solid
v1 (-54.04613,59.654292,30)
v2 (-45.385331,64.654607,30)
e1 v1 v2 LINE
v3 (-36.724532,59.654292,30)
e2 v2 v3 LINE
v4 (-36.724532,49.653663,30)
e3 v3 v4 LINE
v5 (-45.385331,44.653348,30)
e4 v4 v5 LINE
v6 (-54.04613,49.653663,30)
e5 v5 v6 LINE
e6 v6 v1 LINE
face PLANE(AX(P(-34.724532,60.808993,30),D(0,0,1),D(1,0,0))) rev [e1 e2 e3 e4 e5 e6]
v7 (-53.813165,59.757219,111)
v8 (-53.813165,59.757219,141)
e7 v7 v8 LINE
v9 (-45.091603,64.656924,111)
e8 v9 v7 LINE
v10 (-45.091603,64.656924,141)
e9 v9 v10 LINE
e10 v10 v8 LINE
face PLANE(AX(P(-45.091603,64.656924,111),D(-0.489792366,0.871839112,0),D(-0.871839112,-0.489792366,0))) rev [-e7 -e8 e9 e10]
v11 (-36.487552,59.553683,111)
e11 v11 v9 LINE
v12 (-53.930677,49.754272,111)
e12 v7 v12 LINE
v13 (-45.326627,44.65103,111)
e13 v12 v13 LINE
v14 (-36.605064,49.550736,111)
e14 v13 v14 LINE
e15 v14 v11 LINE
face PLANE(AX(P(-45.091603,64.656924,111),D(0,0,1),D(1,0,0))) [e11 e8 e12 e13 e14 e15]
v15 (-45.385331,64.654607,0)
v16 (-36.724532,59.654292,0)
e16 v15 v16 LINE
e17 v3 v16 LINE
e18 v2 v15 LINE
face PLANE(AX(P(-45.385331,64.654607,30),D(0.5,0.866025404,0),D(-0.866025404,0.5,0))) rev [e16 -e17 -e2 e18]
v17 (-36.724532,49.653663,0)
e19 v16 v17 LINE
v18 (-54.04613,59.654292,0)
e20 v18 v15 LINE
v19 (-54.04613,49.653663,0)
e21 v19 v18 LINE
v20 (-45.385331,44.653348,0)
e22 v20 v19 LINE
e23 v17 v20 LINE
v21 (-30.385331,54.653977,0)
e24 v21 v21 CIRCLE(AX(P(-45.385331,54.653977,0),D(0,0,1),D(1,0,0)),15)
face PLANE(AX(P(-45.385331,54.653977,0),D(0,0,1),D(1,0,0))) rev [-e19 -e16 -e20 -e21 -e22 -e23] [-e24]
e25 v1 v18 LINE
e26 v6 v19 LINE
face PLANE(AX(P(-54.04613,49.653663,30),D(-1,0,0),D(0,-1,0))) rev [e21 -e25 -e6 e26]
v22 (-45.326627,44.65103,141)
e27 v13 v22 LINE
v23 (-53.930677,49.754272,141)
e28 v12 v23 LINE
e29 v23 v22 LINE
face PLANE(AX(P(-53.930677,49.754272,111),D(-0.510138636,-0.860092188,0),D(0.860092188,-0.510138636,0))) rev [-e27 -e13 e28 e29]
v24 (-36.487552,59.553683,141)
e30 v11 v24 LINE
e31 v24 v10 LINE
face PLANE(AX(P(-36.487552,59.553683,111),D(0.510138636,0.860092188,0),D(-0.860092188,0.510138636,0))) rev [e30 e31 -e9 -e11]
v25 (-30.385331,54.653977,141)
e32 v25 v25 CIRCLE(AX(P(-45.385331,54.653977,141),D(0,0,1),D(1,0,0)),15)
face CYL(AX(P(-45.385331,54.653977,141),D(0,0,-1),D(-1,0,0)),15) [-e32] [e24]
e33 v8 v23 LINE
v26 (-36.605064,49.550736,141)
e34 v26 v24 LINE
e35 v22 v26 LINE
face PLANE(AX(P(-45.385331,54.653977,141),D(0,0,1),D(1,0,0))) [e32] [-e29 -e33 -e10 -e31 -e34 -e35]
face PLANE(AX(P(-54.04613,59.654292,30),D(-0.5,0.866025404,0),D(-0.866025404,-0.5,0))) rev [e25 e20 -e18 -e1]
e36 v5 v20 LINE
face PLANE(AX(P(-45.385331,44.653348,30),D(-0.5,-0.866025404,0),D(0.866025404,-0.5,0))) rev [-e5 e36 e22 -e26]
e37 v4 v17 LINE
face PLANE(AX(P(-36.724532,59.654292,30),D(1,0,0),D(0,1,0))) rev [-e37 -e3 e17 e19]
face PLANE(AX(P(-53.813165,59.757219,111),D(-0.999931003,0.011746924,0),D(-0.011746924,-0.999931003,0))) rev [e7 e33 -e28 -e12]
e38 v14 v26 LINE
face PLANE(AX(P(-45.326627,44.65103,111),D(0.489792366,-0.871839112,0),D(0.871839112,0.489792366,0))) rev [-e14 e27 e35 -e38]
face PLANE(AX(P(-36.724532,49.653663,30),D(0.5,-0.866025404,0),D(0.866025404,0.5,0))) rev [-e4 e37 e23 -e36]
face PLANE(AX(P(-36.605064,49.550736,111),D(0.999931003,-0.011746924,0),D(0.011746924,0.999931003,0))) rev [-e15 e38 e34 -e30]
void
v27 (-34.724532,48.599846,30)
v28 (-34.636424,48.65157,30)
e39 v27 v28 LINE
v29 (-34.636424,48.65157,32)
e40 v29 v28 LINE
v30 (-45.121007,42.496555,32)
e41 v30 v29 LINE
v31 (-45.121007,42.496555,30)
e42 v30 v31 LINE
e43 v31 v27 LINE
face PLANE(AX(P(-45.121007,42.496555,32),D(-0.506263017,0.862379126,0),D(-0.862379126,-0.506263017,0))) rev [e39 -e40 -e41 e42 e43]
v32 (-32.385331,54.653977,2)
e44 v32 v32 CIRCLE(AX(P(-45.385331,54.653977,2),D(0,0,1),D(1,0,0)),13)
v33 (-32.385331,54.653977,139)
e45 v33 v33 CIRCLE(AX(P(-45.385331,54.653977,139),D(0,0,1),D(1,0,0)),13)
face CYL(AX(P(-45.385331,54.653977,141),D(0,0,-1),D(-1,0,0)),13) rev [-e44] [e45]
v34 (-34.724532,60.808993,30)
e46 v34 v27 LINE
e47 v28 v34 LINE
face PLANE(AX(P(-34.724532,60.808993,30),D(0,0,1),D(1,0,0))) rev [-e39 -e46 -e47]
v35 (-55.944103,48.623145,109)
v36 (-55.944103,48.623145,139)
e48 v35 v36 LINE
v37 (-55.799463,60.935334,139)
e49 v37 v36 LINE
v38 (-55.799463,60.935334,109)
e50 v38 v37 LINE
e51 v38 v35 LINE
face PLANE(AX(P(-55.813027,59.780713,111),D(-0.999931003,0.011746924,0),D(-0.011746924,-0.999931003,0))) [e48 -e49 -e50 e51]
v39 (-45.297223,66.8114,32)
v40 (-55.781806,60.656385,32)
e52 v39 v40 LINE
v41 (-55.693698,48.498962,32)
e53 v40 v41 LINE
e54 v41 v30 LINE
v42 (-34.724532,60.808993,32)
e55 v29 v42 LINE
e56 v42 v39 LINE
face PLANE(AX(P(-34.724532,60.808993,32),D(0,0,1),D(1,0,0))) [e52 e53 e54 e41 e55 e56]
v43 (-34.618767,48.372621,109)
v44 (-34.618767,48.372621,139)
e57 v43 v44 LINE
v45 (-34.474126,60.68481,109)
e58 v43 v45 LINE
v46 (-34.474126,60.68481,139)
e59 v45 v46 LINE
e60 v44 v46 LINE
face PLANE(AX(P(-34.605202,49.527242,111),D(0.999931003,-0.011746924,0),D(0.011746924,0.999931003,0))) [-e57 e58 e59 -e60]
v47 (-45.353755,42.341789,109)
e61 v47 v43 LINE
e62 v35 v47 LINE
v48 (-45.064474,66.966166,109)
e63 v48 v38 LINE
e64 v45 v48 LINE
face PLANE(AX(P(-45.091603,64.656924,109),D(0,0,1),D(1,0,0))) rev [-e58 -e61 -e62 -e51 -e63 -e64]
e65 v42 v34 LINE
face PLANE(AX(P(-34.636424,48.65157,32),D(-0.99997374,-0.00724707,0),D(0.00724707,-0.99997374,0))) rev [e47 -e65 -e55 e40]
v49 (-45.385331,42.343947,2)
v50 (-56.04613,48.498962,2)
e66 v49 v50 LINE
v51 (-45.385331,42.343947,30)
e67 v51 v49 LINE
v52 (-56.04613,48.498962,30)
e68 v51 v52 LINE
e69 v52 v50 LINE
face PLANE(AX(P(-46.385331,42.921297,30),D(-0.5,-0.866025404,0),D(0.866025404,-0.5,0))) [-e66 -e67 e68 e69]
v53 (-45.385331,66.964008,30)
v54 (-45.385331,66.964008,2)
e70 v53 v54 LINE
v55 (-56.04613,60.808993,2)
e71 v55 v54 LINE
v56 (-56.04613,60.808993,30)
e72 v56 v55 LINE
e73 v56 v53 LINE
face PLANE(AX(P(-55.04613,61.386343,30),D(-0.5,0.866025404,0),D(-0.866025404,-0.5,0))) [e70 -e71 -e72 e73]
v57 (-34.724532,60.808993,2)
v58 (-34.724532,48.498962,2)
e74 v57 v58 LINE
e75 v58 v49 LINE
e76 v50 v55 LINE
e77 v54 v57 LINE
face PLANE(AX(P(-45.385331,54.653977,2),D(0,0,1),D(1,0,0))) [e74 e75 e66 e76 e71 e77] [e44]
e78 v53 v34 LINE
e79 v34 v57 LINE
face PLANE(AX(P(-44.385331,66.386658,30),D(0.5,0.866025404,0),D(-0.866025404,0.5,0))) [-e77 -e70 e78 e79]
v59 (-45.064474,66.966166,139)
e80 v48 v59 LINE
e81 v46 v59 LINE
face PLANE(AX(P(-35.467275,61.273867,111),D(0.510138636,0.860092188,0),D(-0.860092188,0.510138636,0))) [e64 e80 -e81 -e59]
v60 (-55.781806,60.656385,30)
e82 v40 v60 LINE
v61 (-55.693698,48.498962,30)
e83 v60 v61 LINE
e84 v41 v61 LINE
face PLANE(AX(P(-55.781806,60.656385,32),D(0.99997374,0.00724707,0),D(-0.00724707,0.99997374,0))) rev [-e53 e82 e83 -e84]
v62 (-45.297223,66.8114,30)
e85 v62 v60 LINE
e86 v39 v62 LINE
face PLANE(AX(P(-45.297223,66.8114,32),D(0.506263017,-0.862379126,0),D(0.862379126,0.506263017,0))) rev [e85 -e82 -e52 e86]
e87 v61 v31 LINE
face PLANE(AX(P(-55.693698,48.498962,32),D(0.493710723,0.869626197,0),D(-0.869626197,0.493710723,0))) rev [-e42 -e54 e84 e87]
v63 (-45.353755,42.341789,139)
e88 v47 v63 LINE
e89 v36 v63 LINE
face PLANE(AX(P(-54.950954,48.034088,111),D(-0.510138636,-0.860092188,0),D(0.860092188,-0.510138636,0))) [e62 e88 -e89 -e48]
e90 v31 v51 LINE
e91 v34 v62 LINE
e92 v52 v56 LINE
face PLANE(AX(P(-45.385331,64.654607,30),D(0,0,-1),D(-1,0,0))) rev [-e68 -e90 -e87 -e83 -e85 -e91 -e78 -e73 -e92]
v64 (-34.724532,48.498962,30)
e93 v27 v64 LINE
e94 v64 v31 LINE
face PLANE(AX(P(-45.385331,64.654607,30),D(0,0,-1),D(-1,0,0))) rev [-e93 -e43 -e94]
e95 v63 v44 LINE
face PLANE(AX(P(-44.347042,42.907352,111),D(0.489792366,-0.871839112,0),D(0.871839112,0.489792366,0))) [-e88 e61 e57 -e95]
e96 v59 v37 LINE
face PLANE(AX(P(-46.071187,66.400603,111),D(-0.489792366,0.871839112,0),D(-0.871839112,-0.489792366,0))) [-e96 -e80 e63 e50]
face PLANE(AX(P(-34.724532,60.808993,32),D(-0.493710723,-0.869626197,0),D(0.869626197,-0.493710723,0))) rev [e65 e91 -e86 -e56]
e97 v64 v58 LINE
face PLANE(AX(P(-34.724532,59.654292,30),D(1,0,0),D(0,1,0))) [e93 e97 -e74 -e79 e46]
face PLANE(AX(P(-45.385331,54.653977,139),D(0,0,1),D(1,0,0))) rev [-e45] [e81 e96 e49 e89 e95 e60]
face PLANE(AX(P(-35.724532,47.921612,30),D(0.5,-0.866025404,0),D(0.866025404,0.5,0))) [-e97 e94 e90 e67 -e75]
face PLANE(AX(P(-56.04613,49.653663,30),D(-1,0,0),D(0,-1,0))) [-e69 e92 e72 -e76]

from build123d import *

# Parameters (mm, degrees)
SKETCH1_R          = 15
EXTRUDE1_DEPTH     = 141
EXTRUDE2_DEPTH     = 30
EXTRUDE3_DEPTH     = 30
SHELL5_START       = 30
SHELL5_OUTLINE_R   = 13
SHELL5_DEPTH       = 79
SHELL5_START_2     = 2
SHELL5_2_OUTLINE_R = 13
SHELL5_2_DEPTH     = 137
SHELL5_START_3     = 109
SHELL5_3_DEPTH     = 30
SHELL5_4_DEPTH     = 28
EXTRUDE4_DEPTH     = 2


# Read off the part's stored shape, not the designer's step: Shell5
with BuildPart() as part:
    # Sketch1 → Extrude1 (new body)
    with BuildSketch(Plane.XY):
        with Locations((-45.385330641, 54.653977414)):
            Circle(SKETCH1_R)
    extrude(amount=EXTRUDE1_DEPTH)

    # Sketch2 → Extrude2 (cut)
    with BuildSketch(Plane.XY.offset(141)):
        Polygon((-45.091602644, 64.656924427), (-53.813164855, 59.757219273), (-53.930676827, 49.754272261), (-45.326626587, 44.651030402), (-36.605064376, 49.550735556), (-36.487552404, 59.553682568), align=None)
    extrude(amount=-EXTRUDE2_DEPTH, mode=Mode.SUBTRACT)

    # Sketch5 → Extrude3 (cut)
    with BuildSketch(Plane(origin=(0, 0, 0), x_dir=(-1, 0, 0), z_dir=(0, 0, -1))):
        Polygon((45.385330641, 64.654606726), (36.724531603, 59.65429207), (36.724531603, 49.653662759), (45.385330641, 44.653348103), (54.046129679, 49.653662759), (54.046129679, 59.65429207), align=None)
    extrude(amount=-EXTRUDE3_DEPTH, mode=Mode.SUBTRACT)

    # Shell5 outline → Shell5 (cut)
    with BuildSketch(Plane.XY.offset(SHELL5_START)):
        with Locations((-45.385330641, 54.653977414)):
            Circle(SHELL5_OUTLINE_R)
    extrude(amount=SHELL5_DEPTH, mode=Mode.SUBTRACT)

    # Shell5 2 outline → Shell5 2 (cut)
    with BuildSketch(Plane.XY.offset(SHELL5_START_2)):
        with Locations((-45.385330641, 54.653977414)):
            Circle(SHELL5_2_OUTLINE_R)
        Polygon((-45.064474284, 66.966166161), (-34.474126219, 60.684809586), (-34.618766551, 48.37262084), (-45.353754947, 42.341788668), (-45.371174081, 42.35212032), (-45.385330641, 42.343947026), (-56.046129679, 48.49896222), (-56.046129679, 60.808992609), (-45.385330641, 66.964007803), (-45.228988272, 66.873743494), align=None, mode=Mode.SUBTRACT)
    extrude(amount=SHELL5_2_DEPTH, mode=Mode.SUBTRACT)

    # Shell5 3 outline → Shell5 3 (cut)
    with BuildSketch(Plane.XY.offset(SHELL5_START_3)):
        Polygon((-55.79946268, 60.935333989), (-45.228988272, 66.873743494), (-45.385330641, 66.964007803), (-56.046129679, 60.808992609), (-56.046129679, 48.49896222), (-45.385330641, 42.343947026), (-45.371174081, 42.35212032), (-55.944103012, 48.623145243), align=None)
    extrude(amount=SHELL5_3_DEPTH, mode=Mode.SUBTRACT)

    # Shell5 4 outline → Shell5 4 (cut)
    with BuildSketch(Plane.XY.offset(SHELL5_START_2)):
        Polygon((-34.618766551, 48.37262084), (-34.474126219, 60.684809586), (-45.064474284, 66.966166161), (-45.228988272, 66.873743494), (-34.724531603, 60.808992609), (-34.724531603, 48.49896222), (-45.371174081, 42.35212032), (-45.353754947, 42.341788668), align=None)
    extrude(amount=SHELL5_4_DEPTH, mode=Mode.SUBTRACT)

    # Sketch6 → Extrude4 (add)
    with BuildSketch(Plane.XY.offset(30)):
        Polygon((-34.724531603, 60.808992609), (-45.297222628, 66.811400248), (-55.78180564, 60.656385054), (-55.693697628, 48.49896222), (-45.121006603, 42.496554581), (-34.63642359, 48.651569775), align=None)
    extrude(amount=EXTRUDE4_DEPTH)


solid = part.part
